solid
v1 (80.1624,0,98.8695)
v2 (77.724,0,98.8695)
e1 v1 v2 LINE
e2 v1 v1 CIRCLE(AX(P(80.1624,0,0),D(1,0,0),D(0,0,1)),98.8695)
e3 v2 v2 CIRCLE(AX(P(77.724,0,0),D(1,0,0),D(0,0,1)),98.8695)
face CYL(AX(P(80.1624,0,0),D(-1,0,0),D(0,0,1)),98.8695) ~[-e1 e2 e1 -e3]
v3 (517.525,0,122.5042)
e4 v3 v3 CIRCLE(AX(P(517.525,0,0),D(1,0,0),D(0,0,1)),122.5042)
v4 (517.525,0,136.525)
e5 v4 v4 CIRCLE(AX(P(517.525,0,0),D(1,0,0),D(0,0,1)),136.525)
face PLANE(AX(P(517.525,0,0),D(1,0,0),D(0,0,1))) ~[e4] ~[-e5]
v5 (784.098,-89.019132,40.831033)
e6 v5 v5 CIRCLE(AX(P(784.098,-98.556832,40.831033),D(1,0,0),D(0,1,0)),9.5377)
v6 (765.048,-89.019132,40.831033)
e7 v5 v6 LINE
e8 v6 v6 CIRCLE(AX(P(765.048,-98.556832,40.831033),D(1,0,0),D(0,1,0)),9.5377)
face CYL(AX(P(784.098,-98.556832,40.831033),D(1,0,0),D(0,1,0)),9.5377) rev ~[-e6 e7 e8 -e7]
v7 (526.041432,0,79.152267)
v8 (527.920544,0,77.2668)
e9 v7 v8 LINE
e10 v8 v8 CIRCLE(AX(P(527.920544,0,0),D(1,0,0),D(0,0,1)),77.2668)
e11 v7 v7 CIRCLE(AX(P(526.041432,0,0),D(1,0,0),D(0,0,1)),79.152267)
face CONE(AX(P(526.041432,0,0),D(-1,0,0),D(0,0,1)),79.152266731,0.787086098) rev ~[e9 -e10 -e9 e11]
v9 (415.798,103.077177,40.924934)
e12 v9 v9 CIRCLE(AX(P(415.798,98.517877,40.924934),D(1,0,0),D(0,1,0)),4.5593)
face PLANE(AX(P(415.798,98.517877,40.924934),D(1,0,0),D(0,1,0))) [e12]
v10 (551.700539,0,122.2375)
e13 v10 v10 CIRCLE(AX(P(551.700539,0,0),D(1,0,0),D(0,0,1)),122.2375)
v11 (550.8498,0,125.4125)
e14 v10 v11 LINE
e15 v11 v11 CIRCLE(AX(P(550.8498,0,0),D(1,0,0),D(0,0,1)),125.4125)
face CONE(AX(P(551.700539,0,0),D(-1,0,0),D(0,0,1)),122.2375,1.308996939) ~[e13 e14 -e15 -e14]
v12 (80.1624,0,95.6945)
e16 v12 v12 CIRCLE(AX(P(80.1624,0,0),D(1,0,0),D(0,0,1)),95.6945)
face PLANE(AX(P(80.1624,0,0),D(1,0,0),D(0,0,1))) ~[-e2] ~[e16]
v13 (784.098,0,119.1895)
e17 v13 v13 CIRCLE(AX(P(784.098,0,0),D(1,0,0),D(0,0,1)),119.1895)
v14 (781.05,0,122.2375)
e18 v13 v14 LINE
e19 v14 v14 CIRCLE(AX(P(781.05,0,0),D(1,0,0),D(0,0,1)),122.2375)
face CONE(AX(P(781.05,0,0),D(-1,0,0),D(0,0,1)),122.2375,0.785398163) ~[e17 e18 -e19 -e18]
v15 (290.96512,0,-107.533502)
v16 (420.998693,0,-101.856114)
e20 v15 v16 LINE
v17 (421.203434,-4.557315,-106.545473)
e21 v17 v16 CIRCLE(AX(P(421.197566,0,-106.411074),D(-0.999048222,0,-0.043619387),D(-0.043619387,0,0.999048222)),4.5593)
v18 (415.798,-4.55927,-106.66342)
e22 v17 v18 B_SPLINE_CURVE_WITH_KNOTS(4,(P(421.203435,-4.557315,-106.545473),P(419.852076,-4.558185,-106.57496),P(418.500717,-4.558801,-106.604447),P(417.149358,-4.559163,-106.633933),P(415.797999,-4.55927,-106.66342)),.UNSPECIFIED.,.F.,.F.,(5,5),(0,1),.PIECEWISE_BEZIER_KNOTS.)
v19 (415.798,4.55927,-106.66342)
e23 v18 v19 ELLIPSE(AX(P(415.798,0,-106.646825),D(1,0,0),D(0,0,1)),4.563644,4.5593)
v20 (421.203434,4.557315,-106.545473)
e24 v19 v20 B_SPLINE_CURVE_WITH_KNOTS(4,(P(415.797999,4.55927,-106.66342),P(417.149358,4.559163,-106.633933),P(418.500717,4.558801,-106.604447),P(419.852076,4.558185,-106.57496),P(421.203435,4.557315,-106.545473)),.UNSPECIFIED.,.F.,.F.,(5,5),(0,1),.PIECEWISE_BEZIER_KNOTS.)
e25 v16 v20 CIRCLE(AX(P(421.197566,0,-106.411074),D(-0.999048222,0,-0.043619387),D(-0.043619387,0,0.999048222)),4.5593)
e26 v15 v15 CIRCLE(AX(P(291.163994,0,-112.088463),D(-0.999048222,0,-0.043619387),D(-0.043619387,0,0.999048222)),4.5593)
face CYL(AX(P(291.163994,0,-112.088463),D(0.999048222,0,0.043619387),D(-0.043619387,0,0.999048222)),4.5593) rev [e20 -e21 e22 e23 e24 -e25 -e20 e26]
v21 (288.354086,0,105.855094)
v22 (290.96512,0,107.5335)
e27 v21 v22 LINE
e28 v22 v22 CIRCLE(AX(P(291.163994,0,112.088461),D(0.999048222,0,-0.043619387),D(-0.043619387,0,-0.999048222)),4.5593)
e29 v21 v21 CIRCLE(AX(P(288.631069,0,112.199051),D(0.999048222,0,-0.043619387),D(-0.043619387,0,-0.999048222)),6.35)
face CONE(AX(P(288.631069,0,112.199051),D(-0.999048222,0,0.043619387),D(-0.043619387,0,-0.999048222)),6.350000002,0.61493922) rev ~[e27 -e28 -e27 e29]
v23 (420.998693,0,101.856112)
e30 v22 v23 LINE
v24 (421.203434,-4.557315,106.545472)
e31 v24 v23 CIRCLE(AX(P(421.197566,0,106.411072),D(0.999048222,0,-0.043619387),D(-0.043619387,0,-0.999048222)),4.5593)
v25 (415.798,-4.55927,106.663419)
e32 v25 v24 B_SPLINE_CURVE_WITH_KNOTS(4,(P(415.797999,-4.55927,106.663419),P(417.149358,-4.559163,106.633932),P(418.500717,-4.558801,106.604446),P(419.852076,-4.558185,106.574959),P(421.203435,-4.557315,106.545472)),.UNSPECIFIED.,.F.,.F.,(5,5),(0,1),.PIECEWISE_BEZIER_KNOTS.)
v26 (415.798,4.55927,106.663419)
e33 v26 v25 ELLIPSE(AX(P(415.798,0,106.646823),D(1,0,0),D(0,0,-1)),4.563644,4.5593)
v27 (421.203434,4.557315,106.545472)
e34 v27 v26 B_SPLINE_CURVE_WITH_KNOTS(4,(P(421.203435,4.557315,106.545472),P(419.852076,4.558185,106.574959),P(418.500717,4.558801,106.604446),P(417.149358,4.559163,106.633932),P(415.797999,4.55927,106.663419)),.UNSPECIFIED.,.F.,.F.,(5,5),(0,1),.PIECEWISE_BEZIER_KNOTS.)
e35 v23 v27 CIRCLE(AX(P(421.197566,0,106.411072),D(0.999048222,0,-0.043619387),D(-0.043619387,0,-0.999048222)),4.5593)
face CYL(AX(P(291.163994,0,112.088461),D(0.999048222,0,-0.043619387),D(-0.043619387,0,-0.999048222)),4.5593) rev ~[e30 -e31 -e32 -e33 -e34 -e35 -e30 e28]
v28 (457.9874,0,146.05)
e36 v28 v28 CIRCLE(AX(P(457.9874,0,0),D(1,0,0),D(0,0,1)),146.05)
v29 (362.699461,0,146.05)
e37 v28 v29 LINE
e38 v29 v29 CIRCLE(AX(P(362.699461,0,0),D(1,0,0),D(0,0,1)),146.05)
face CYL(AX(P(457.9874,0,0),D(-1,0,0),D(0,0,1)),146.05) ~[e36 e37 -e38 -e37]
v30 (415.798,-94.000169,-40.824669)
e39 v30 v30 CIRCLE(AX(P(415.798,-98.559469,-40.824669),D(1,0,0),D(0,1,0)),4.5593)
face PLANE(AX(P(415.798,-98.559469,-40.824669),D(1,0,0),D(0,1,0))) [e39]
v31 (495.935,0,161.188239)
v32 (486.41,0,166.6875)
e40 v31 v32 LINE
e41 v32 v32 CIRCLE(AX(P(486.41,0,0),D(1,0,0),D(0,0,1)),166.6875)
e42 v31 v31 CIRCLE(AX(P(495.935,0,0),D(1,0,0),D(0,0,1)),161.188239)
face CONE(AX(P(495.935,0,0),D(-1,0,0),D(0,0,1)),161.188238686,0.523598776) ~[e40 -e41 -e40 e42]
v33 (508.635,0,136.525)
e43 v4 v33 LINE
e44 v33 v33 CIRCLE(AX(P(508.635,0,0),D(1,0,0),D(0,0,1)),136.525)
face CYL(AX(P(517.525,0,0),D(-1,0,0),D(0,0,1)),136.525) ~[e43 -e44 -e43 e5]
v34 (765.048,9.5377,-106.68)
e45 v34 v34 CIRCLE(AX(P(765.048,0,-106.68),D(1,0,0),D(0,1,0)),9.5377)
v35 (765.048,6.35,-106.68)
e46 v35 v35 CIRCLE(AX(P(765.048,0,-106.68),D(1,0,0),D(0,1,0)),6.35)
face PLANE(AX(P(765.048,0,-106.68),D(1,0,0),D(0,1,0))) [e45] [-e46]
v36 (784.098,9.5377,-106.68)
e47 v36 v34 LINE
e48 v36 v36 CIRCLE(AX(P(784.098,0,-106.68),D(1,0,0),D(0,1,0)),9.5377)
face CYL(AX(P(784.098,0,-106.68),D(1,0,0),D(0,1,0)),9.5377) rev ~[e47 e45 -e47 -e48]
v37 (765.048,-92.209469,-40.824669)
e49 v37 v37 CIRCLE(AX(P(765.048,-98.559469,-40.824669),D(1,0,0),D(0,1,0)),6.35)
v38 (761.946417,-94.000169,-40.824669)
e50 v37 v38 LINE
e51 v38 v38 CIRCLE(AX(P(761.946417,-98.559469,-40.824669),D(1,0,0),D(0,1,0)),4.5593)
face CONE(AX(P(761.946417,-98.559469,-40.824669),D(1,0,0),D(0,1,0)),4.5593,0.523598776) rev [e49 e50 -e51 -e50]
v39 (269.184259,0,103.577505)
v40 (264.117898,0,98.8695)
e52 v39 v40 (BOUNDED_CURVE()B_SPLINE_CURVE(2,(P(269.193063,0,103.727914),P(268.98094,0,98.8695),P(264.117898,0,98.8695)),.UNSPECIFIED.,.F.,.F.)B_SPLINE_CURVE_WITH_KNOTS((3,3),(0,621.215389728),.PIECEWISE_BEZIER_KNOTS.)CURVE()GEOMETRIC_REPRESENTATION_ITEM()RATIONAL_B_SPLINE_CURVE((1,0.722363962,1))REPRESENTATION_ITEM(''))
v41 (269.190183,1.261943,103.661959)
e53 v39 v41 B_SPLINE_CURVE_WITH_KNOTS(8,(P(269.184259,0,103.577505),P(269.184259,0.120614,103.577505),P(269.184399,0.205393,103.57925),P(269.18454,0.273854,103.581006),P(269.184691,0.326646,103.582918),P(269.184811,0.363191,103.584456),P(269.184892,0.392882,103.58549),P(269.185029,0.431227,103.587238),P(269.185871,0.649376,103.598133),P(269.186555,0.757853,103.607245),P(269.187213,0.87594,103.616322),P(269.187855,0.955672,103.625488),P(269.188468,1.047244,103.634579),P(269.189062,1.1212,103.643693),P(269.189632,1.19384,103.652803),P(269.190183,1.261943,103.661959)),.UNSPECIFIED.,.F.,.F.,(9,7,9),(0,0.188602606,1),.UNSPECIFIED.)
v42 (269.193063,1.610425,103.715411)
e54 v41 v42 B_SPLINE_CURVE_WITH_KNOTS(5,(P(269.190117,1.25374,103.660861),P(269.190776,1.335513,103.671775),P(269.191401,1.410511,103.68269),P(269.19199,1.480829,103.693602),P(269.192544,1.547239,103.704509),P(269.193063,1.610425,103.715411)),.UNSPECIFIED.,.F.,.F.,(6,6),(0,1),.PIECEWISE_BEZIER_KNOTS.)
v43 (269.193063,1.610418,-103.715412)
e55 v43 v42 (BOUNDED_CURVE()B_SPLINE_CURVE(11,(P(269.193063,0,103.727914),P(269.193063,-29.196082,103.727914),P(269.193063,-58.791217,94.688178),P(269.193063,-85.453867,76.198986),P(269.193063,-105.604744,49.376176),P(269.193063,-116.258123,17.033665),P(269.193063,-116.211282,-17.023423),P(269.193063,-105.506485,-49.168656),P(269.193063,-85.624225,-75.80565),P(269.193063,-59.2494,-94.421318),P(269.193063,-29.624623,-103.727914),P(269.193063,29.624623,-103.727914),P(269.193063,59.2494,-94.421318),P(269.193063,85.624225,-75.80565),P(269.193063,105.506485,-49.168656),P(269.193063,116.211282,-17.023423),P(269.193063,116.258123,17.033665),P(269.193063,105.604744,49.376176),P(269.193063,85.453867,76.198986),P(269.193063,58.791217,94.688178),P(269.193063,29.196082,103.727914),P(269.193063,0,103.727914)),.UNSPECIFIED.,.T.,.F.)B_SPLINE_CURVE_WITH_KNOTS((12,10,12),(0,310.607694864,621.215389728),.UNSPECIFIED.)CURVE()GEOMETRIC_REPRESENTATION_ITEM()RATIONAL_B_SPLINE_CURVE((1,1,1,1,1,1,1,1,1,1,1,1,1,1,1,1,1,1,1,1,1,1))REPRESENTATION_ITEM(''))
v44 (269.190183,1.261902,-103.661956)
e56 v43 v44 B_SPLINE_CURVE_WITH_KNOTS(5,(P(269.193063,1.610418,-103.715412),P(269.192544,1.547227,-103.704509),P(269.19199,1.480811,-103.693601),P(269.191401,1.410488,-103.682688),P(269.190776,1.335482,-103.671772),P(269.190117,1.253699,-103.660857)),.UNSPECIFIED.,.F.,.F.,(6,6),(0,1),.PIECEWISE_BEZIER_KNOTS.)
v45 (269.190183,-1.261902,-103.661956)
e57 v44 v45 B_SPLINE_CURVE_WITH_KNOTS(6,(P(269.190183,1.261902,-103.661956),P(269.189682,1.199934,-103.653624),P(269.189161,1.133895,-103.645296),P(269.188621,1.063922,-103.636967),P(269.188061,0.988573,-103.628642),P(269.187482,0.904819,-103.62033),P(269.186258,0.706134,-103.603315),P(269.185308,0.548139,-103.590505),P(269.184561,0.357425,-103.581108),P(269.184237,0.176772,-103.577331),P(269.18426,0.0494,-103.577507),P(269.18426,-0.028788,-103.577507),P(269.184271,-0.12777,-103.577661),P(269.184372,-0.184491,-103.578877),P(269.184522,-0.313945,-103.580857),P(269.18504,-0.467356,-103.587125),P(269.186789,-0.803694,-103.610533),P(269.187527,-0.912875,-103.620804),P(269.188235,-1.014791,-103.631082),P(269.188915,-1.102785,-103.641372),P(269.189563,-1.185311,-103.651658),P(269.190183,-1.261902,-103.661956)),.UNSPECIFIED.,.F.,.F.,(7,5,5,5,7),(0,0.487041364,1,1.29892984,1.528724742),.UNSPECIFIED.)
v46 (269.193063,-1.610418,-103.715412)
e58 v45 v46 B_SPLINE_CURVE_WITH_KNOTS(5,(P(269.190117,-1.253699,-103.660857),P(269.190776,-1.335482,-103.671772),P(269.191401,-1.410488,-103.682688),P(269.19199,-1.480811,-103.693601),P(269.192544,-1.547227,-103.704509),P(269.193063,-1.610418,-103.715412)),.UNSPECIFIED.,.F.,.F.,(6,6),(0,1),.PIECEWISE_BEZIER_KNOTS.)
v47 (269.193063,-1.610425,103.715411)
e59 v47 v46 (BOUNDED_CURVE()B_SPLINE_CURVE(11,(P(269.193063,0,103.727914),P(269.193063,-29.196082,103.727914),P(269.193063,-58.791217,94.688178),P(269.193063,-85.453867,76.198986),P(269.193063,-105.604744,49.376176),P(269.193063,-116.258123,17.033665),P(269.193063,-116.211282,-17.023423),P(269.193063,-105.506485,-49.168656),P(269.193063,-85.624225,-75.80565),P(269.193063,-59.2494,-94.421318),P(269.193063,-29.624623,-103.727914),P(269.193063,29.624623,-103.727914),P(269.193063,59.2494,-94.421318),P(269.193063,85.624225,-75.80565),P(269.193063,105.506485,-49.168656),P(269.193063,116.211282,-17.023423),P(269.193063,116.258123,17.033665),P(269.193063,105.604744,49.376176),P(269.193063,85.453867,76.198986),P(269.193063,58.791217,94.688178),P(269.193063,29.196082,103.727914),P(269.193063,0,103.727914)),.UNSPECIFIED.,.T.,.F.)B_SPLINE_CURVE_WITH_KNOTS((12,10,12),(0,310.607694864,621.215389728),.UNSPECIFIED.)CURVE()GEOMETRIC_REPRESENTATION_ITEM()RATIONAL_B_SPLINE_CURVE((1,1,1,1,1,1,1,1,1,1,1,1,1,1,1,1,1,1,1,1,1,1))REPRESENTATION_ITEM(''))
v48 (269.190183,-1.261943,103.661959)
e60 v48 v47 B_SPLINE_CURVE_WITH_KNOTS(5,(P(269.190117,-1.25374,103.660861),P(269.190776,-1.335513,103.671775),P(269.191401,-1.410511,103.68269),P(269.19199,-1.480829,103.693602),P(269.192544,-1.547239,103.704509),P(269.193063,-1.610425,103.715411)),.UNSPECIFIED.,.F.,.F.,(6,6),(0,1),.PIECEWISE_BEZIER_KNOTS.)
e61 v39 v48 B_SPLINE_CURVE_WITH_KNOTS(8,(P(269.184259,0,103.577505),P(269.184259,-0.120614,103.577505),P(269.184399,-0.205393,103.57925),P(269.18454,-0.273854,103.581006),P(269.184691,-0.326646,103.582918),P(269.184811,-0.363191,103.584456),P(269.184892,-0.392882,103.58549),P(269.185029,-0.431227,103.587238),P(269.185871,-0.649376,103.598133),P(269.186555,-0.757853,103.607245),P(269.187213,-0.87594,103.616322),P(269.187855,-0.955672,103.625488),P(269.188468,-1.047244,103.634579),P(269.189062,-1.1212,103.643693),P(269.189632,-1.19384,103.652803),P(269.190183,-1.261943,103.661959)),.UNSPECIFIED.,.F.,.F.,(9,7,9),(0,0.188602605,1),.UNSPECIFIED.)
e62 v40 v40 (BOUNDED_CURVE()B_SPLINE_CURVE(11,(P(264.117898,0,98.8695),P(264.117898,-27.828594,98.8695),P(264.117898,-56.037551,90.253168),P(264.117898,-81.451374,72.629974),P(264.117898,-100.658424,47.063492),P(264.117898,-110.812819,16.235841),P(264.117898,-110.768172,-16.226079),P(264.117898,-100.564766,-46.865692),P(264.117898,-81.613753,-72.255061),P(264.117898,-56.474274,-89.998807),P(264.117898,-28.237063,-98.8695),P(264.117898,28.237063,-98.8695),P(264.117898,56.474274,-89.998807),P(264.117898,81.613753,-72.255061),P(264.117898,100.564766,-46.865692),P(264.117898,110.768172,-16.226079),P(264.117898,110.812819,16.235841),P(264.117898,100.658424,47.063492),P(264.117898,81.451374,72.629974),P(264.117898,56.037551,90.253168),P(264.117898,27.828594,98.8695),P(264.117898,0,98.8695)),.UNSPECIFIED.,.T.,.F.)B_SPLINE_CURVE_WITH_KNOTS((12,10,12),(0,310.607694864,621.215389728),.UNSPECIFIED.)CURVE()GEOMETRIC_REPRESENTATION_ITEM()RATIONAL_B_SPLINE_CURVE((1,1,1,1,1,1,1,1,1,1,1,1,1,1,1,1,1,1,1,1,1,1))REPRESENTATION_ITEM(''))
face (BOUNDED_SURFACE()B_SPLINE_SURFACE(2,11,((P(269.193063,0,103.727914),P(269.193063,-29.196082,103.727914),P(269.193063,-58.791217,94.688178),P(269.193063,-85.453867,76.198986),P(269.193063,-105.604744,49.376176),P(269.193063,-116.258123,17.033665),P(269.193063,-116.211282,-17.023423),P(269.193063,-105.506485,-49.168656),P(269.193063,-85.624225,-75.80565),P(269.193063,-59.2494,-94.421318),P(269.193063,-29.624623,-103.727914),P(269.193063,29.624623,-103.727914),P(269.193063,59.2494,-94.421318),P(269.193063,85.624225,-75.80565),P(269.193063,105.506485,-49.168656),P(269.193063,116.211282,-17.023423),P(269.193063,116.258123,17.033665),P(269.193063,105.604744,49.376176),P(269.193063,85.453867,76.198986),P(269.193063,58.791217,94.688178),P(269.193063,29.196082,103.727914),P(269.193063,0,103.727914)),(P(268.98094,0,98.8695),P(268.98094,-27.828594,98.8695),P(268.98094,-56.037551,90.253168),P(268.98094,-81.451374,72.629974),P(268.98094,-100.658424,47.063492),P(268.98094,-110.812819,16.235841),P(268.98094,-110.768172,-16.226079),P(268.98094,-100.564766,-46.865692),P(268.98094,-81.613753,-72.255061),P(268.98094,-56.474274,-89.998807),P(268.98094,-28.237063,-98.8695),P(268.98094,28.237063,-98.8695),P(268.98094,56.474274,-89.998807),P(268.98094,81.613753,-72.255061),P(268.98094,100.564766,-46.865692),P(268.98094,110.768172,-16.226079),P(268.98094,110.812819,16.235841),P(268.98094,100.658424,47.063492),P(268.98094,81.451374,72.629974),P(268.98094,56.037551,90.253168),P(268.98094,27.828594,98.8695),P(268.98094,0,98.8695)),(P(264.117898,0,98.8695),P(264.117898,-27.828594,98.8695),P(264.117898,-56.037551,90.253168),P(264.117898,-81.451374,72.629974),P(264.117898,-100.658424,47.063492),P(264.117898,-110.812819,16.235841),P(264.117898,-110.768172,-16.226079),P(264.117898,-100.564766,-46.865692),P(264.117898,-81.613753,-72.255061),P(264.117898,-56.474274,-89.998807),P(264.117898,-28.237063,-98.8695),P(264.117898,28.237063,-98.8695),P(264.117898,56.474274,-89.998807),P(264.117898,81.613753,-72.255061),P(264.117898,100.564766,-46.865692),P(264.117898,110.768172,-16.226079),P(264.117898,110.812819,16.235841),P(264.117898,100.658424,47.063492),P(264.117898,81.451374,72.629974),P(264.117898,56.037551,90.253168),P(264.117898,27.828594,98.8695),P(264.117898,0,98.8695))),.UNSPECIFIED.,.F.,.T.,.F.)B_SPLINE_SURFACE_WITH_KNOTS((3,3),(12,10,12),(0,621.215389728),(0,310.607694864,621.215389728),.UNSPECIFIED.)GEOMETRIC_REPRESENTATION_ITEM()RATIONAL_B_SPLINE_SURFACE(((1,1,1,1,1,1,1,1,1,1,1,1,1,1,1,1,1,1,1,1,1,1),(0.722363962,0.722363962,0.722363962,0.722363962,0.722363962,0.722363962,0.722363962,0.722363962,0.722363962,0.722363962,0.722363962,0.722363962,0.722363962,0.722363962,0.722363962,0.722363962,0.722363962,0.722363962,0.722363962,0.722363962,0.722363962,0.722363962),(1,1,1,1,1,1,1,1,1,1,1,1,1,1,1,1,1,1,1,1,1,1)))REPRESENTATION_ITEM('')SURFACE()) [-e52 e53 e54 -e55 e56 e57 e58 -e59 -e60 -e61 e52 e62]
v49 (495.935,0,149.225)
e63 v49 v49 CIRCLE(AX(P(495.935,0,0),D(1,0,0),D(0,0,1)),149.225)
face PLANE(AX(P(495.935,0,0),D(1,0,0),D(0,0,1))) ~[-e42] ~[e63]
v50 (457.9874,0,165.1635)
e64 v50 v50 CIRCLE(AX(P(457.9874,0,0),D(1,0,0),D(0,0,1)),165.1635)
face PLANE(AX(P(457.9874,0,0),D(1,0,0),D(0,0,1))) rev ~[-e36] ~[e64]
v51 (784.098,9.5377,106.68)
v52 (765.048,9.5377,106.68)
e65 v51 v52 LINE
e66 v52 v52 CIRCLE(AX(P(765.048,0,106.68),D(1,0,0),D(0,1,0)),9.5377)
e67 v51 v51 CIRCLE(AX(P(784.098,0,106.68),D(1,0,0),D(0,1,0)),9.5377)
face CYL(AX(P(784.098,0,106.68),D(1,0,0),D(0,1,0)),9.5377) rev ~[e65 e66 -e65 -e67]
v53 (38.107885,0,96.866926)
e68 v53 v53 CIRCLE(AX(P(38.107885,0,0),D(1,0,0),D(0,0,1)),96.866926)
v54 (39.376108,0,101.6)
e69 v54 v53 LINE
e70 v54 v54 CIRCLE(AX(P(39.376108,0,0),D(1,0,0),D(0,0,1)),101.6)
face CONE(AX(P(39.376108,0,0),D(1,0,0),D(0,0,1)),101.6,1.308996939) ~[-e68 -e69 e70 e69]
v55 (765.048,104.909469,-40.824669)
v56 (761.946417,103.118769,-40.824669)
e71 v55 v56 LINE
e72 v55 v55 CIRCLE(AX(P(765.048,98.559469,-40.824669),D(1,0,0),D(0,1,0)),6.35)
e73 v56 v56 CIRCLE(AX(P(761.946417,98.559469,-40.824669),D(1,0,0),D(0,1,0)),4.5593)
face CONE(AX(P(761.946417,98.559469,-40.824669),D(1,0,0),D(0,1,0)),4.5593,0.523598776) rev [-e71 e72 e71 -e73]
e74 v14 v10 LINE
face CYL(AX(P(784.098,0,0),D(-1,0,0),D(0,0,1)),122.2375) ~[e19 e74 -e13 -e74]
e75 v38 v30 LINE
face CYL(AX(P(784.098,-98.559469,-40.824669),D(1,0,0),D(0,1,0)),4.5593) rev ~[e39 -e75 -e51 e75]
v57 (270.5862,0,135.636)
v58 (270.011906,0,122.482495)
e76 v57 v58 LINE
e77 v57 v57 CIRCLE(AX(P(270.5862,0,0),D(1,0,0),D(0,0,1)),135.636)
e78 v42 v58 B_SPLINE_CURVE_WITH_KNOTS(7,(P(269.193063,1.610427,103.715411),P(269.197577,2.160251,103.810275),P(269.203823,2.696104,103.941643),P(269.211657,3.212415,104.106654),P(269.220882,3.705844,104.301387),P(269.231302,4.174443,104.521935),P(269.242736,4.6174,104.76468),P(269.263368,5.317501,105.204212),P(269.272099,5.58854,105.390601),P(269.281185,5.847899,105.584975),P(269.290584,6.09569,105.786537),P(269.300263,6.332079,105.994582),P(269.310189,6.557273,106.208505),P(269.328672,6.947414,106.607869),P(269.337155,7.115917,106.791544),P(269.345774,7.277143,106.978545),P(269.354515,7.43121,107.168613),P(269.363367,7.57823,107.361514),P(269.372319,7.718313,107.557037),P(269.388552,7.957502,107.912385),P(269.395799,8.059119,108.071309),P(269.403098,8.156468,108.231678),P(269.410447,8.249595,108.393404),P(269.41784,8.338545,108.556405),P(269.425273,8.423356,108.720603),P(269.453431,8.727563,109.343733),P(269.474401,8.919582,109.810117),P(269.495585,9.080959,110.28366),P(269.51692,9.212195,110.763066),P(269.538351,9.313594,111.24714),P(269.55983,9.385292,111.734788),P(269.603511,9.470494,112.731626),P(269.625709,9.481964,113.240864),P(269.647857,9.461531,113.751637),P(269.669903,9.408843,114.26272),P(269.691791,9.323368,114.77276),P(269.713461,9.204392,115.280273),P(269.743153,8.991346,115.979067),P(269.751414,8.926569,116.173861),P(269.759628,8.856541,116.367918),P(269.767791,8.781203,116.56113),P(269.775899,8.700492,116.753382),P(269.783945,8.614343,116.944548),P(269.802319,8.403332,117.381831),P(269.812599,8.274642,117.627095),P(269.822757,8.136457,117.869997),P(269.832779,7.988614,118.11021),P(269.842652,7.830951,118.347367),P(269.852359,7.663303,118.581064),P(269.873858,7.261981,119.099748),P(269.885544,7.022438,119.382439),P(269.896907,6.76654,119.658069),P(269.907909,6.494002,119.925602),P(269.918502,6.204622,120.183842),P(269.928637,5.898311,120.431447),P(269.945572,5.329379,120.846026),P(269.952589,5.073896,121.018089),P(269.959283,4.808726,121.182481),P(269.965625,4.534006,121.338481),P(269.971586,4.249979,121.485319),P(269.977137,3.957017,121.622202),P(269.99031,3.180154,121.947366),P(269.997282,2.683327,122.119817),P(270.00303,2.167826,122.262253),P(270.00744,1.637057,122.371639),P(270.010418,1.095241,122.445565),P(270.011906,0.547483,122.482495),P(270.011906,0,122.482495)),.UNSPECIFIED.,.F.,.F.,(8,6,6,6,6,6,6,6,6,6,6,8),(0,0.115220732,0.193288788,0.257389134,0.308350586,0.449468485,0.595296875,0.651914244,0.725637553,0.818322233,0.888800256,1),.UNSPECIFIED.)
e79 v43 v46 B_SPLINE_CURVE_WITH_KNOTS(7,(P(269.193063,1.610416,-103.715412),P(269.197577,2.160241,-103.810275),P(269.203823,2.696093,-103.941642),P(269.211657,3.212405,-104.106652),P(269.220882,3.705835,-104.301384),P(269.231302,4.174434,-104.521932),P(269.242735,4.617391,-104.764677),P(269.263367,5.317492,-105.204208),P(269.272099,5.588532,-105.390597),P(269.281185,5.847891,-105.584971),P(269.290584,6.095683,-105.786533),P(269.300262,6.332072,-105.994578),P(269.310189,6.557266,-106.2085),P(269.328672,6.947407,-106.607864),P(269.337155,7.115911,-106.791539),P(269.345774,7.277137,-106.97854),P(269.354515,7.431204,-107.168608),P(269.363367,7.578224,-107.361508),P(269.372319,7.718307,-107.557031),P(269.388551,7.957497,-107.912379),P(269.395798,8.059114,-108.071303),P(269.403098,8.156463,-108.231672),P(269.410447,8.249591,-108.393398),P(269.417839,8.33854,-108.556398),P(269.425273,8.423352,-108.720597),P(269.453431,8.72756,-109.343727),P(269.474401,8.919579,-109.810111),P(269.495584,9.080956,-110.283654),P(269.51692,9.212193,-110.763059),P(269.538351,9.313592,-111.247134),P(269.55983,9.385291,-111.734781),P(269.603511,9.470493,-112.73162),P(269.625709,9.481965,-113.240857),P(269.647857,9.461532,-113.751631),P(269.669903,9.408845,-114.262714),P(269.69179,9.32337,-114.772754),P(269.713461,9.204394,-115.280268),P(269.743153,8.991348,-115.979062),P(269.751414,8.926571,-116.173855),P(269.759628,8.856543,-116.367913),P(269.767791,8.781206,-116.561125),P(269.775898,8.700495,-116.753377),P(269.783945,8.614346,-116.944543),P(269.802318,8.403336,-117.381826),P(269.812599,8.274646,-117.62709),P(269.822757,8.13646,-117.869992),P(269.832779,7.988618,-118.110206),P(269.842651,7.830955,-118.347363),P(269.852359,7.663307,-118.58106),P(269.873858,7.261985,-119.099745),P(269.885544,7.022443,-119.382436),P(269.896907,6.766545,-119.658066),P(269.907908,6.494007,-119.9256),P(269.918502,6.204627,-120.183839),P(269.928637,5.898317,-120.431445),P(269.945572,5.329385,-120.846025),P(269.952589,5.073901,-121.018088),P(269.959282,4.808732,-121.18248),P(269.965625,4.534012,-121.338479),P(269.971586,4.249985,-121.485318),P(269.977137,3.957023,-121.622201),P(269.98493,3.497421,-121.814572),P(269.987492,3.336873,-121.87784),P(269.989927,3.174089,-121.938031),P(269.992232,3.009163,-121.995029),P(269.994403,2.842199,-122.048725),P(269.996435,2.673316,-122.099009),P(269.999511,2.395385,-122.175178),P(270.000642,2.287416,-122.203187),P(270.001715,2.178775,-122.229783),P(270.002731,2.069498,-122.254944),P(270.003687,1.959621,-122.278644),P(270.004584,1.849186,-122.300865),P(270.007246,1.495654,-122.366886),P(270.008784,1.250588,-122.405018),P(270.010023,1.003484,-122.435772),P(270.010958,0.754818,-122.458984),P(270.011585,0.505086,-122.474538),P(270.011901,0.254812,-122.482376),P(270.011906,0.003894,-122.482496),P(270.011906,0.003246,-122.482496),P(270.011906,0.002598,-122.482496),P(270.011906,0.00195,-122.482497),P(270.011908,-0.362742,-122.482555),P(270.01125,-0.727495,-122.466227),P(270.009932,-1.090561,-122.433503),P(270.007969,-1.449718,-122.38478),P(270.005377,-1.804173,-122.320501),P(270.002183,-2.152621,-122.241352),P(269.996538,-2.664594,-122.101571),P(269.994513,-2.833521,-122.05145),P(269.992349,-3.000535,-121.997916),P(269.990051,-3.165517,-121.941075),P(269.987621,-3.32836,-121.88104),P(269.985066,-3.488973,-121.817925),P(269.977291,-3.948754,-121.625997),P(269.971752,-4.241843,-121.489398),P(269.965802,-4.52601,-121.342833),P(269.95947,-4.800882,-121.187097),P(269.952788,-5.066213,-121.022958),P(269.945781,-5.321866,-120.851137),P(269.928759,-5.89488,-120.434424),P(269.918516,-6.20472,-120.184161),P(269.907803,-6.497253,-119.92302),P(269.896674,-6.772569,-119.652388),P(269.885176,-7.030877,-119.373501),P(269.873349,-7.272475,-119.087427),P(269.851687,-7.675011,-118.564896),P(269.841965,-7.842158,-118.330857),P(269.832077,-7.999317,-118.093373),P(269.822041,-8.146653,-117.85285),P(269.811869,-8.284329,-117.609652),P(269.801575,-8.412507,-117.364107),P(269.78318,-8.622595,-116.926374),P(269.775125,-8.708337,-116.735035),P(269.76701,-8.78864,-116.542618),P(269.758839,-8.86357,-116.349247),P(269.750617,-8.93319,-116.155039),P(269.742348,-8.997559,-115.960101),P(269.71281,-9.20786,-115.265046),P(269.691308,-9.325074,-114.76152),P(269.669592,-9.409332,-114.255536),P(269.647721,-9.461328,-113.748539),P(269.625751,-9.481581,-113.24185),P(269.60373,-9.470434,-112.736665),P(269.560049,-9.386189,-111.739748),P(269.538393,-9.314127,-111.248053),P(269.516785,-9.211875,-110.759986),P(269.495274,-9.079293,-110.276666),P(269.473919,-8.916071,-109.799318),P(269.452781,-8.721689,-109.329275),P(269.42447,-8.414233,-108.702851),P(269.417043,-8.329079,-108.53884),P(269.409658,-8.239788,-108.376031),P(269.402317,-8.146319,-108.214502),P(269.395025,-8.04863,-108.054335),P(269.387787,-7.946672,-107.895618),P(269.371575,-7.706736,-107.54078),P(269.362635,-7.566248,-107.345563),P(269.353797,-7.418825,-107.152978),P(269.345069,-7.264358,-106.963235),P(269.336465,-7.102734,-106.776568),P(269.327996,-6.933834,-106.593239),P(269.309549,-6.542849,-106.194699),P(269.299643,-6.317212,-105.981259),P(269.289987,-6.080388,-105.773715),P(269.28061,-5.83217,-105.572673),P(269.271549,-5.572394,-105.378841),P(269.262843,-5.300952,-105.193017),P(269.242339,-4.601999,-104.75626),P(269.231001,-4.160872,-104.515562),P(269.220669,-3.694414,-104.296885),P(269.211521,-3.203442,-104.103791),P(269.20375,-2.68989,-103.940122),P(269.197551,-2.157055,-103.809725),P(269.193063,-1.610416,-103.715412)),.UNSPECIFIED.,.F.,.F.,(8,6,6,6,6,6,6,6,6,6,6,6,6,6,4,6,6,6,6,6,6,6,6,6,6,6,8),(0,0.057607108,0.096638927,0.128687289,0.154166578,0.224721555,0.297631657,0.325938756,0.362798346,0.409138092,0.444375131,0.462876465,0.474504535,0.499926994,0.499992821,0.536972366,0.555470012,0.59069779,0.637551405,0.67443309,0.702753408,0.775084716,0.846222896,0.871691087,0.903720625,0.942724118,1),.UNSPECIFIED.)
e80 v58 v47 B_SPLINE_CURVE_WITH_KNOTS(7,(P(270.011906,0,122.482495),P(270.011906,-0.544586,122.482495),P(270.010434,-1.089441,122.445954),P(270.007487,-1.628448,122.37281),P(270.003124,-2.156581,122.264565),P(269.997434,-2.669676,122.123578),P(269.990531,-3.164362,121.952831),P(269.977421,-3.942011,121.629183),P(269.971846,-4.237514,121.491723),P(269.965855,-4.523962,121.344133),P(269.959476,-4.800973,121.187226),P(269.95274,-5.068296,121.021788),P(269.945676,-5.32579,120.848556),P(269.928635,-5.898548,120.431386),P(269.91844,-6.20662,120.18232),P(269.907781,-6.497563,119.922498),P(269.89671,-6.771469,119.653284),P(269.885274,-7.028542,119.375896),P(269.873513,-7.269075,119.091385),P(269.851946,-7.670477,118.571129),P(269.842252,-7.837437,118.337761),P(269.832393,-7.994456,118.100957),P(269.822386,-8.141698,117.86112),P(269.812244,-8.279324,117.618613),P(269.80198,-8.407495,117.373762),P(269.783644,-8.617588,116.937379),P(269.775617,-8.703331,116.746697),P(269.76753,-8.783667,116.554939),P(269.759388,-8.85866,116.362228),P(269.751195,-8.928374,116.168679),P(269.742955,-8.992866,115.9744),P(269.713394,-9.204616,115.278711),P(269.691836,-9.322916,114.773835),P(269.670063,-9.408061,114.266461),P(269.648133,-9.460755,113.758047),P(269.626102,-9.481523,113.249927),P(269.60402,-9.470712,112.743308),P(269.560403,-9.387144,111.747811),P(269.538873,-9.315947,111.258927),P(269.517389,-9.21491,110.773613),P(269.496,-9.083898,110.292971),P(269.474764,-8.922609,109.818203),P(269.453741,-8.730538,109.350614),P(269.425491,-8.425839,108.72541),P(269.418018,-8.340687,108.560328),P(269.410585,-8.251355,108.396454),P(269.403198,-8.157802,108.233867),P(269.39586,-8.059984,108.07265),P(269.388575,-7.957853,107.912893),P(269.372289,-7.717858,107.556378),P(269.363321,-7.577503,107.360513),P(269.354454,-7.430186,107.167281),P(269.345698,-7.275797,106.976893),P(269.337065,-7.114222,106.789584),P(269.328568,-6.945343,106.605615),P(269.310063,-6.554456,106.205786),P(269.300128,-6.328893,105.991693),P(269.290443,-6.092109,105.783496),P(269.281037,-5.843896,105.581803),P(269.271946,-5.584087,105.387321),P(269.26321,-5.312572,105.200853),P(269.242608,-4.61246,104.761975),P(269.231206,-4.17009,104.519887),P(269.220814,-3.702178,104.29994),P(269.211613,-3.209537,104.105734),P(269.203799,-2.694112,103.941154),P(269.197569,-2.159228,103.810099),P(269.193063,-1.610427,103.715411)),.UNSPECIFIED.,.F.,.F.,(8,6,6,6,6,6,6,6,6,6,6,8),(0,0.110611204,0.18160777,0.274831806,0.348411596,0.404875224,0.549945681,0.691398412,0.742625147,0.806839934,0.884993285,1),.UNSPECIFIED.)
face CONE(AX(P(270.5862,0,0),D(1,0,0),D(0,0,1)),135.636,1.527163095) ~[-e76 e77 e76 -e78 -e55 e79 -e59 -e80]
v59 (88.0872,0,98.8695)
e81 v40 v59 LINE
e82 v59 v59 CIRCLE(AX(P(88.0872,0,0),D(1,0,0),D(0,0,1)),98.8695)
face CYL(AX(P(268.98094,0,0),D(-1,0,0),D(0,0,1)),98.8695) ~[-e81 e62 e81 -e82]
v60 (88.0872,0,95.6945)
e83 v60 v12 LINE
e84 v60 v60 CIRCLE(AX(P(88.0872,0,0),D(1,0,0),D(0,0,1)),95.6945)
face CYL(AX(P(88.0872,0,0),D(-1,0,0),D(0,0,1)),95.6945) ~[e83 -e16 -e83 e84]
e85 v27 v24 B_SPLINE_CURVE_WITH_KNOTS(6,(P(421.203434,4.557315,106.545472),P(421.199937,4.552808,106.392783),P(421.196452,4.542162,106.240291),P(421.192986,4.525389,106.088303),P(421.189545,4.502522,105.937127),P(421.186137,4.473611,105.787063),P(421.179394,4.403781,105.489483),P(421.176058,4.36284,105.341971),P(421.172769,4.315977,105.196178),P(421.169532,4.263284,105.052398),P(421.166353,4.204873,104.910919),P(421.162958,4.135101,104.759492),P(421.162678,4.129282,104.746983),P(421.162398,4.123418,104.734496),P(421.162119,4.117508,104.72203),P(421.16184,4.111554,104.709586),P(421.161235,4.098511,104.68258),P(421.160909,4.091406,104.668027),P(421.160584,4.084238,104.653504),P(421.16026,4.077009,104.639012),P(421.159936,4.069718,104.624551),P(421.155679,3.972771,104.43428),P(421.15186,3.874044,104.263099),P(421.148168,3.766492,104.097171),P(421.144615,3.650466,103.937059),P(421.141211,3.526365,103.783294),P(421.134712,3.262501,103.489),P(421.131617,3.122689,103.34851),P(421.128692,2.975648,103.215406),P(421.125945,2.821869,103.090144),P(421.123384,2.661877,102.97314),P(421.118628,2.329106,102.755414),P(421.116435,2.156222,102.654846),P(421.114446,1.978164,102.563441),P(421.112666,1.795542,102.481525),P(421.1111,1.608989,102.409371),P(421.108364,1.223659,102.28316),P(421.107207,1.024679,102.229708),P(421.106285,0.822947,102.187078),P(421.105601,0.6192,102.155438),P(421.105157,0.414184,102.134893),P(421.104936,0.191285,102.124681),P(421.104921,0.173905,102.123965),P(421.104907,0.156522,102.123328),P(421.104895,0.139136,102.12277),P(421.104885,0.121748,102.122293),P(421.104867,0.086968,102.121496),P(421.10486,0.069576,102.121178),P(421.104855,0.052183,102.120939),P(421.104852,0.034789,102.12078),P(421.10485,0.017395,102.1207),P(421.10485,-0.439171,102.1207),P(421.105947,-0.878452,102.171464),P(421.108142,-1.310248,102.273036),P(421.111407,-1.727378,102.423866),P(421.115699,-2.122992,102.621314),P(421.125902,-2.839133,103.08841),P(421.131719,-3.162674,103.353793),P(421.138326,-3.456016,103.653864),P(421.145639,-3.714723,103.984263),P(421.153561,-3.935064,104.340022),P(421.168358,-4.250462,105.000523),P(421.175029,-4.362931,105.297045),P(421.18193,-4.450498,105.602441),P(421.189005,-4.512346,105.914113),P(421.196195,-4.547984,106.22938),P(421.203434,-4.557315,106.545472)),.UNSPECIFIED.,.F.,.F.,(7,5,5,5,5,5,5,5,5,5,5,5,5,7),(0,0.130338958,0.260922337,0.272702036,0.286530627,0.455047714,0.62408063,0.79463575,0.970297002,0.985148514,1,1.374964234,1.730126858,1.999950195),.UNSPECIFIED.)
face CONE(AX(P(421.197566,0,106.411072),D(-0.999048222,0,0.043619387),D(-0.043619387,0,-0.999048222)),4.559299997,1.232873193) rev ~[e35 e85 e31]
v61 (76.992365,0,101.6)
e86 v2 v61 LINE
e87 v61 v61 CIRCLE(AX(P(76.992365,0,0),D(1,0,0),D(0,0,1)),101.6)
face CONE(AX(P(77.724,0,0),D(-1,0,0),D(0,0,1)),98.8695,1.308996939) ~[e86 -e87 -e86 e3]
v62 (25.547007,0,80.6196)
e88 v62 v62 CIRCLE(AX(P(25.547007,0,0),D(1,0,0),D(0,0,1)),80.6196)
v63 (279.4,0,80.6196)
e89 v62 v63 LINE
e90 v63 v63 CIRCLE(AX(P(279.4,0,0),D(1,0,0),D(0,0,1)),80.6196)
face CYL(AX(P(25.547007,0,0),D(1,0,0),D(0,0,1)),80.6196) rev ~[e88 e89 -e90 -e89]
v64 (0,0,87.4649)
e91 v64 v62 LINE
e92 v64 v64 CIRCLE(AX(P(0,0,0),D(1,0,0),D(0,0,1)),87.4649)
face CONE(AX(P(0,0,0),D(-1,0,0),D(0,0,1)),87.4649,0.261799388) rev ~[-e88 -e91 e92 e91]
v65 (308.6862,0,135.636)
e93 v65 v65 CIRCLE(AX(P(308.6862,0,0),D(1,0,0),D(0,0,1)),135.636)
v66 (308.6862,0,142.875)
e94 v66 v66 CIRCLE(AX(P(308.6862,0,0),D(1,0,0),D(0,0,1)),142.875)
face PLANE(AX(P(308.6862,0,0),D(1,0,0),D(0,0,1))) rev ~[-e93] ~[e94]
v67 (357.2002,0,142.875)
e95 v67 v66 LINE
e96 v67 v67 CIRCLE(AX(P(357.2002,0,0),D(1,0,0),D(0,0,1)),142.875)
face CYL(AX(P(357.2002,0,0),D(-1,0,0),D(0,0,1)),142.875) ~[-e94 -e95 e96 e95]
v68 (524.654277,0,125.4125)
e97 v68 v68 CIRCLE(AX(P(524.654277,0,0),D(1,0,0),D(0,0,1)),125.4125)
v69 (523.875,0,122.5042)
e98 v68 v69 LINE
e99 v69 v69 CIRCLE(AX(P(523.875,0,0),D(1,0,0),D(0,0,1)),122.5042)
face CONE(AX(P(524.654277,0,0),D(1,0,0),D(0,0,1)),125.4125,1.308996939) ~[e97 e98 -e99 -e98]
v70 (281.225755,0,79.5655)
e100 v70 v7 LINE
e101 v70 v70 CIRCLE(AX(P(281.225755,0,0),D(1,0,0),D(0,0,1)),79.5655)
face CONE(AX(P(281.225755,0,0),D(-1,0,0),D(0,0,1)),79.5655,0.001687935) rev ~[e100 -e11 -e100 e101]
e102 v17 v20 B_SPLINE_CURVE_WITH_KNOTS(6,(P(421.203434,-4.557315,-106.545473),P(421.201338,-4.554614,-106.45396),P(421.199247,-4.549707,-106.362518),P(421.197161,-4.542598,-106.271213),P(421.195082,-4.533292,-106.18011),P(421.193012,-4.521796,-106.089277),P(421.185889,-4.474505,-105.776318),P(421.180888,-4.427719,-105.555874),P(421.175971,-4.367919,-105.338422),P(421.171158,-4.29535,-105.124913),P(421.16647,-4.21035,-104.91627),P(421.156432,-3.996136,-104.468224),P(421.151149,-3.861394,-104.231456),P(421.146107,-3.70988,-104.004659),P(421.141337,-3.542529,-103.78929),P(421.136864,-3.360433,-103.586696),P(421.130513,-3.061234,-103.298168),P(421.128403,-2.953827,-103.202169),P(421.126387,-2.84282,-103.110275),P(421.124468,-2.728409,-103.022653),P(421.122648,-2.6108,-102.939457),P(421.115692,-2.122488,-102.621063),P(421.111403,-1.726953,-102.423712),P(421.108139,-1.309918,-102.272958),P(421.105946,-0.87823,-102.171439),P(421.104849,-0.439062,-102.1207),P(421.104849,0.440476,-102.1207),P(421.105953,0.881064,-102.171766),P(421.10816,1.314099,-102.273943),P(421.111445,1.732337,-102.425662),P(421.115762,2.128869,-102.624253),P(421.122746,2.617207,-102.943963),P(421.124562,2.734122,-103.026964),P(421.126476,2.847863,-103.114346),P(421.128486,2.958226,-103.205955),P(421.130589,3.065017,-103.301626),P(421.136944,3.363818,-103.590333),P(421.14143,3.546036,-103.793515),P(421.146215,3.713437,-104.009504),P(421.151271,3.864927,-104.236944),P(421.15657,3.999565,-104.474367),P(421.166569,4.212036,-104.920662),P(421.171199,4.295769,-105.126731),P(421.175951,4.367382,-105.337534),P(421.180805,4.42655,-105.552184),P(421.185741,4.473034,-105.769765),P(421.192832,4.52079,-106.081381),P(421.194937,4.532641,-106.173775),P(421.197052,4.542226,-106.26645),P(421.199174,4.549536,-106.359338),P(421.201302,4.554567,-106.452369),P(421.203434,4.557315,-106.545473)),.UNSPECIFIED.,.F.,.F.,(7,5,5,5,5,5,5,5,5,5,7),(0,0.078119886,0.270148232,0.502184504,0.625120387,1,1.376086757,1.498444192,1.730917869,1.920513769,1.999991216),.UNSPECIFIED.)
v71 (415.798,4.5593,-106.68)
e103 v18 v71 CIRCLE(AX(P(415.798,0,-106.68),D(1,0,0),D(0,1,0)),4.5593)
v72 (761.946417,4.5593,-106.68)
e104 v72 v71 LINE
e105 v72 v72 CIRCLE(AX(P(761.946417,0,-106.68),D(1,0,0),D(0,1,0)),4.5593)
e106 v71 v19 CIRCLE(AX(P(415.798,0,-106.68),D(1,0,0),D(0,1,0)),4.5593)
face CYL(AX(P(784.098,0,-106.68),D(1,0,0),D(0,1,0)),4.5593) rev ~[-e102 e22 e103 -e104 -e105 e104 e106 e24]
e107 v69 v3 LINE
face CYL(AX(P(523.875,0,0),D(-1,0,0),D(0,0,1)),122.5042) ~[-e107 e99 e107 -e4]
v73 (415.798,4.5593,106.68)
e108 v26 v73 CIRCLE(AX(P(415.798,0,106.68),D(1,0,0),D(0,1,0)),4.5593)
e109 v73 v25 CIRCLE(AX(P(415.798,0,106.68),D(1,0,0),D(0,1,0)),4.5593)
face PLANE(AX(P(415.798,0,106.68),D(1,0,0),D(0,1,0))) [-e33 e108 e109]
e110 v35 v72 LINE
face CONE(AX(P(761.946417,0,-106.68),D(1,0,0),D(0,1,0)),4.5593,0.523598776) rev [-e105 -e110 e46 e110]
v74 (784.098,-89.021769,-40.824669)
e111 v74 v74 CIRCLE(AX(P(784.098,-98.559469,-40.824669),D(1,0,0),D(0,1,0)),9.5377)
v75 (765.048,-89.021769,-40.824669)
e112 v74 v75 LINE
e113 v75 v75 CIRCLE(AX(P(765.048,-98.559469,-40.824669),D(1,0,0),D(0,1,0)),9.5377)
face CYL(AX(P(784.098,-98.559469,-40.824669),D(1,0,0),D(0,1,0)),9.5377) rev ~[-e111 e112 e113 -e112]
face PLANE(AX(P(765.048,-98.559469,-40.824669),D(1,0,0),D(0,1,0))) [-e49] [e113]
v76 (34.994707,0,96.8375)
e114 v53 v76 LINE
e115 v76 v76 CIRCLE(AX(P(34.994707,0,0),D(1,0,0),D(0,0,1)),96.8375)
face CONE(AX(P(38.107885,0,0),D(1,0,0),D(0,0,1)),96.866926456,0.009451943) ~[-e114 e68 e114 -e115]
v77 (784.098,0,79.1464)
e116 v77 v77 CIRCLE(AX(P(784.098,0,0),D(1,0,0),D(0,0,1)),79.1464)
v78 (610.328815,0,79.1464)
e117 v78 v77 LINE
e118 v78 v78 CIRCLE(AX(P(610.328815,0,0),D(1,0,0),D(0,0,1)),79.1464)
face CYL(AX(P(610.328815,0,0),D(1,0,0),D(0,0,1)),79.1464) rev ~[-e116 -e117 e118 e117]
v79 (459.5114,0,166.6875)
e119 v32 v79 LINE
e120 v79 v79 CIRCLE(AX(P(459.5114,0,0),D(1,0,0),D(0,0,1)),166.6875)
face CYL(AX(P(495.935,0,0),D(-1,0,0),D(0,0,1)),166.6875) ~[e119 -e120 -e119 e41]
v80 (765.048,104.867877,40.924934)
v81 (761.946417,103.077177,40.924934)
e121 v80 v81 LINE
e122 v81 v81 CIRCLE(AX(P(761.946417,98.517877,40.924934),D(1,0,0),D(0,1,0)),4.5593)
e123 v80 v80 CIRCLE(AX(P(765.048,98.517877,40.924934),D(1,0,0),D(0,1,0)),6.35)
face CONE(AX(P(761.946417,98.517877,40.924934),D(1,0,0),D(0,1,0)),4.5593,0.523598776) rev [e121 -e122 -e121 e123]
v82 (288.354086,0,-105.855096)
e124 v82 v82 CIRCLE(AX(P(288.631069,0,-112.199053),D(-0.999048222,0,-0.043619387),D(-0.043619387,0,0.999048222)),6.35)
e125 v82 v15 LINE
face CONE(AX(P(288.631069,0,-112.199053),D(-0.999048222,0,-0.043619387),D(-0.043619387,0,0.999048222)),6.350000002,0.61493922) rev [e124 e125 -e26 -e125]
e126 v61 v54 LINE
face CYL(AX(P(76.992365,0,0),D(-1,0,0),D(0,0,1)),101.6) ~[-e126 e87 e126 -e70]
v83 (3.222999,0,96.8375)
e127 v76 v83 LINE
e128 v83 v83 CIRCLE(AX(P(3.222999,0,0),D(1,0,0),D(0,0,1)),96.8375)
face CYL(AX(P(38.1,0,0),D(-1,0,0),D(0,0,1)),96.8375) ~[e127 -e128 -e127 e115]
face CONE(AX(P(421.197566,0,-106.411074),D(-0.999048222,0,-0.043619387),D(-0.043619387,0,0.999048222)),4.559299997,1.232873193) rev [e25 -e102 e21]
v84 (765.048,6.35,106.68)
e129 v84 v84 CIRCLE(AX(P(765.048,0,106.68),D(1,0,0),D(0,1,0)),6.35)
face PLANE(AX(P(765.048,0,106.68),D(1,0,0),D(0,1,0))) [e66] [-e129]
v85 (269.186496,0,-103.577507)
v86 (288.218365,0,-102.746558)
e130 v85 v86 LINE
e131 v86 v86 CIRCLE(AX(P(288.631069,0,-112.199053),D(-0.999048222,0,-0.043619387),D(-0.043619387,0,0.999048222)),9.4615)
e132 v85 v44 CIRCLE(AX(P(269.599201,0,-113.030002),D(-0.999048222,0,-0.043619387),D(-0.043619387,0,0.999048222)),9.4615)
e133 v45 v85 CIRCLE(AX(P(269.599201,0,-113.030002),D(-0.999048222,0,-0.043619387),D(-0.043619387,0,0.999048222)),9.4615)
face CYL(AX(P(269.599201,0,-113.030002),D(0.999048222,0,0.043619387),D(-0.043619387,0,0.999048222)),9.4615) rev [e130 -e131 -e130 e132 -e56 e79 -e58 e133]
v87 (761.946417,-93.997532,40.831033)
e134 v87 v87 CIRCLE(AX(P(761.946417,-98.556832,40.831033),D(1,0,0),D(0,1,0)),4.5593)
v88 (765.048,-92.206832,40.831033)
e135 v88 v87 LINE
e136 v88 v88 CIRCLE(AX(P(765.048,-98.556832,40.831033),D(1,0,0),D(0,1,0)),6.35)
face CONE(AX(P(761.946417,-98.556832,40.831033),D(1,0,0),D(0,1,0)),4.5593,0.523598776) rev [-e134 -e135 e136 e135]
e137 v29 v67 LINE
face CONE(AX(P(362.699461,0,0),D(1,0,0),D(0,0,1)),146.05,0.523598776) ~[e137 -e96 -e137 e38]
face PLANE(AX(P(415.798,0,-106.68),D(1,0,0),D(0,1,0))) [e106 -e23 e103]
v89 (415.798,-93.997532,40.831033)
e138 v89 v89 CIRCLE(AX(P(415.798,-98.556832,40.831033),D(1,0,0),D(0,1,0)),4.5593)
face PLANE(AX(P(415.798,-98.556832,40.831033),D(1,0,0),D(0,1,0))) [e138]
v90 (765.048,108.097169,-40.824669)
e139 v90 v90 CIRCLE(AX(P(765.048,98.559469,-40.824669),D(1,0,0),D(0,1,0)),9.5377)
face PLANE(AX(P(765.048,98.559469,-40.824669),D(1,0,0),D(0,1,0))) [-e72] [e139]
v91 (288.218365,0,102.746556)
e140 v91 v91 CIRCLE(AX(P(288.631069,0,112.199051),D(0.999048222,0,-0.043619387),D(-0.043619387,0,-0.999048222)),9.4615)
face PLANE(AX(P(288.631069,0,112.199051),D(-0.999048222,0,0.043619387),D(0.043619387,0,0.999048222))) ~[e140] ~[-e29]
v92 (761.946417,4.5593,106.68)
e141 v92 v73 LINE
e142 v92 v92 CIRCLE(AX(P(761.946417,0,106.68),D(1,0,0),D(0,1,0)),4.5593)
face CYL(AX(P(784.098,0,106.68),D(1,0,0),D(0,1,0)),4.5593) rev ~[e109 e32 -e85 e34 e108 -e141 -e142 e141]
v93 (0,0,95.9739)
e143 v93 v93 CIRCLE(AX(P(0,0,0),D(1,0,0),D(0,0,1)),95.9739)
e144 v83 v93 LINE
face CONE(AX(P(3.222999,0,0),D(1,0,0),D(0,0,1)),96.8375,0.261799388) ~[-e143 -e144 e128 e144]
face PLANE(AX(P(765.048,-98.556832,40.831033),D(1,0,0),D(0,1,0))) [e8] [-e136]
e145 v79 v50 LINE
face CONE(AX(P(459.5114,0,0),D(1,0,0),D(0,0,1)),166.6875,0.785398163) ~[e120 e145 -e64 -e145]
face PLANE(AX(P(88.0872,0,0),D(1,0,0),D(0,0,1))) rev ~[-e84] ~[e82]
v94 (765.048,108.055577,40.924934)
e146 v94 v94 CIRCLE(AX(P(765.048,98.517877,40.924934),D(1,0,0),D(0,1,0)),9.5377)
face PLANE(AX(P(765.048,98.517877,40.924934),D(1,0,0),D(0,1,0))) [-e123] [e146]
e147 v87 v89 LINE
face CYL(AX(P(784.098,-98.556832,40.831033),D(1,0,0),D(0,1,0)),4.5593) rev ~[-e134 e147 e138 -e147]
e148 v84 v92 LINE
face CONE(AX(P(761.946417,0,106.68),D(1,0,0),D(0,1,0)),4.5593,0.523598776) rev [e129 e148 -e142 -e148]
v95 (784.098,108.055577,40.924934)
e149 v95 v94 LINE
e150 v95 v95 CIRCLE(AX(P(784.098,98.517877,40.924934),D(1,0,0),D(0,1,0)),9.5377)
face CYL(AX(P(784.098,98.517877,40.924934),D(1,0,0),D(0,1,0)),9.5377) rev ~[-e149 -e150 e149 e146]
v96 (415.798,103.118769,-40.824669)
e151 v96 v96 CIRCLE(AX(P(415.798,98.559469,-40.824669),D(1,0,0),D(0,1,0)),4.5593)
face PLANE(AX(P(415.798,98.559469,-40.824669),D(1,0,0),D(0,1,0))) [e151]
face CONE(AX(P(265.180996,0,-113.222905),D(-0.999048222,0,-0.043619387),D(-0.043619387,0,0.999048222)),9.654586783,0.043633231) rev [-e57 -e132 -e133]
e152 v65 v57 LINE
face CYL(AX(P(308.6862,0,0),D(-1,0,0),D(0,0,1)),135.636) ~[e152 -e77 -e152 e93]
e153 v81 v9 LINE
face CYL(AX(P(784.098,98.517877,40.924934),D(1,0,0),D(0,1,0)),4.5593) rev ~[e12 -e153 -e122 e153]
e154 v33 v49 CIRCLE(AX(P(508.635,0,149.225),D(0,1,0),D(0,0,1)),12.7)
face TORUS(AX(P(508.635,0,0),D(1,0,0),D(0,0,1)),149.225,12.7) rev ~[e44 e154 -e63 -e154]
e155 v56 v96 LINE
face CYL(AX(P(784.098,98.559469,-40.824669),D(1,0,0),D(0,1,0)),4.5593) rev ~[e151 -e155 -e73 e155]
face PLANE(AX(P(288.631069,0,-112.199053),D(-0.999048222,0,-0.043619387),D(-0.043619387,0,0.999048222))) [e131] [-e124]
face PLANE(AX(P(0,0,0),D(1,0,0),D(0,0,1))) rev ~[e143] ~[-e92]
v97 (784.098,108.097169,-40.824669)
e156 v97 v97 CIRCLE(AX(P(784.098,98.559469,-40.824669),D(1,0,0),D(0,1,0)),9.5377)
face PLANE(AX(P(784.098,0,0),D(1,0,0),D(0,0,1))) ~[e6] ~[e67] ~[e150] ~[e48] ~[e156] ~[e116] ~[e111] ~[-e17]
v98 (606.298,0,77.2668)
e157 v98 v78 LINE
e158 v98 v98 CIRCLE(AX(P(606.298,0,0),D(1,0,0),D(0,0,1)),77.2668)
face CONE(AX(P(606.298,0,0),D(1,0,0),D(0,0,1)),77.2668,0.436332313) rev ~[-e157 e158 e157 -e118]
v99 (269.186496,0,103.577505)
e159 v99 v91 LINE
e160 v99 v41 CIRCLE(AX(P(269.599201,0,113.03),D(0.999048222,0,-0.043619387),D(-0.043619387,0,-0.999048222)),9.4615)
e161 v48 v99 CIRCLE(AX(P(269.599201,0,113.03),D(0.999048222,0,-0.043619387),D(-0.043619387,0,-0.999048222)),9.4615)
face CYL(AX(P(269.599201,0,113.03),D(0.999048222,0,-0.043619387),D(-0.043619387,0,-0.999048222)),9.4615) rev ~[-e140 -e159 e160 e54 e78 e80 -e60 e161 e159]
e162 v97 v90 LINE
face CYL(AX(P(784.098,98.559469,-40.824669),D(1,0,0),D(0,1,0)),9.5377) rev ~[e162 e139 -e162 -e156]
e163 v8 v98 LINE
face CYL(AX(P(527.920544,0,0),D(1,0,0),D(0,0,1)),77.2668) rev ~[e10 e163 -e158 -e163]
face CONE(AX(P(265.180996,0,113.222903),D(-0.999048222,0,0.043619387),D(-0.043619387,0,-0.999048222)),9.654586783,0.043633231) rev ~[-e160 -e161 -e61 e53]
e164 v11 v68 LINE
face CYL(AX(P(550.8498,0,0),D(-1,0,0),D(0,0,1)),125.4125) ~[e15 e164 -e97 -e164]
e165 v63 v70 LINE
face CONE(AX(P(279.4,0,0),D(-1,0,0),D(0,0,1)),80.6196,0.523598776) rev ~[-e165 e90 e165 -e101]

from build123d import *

# Parameters (mm, degrees)
F3_R      = 12.7
F4_R      = 5.08
F6_SIZE   = 3.048
F7_SIZE   = 1.524
F8_R      = 4.5593
F9_DEPTH  = 368.3
F10_R     = 9.5377
F11_DEPTH = 19.05
F12_SIZE2 = 3.1015833811
F12_SIZE  = 1.7907


# Not quite as in the source:
# - a fillet or chamfer that OpenCascade refuses, or shapes differently, is made with other operations: its cross-section is extruded or revolved along the edge and cut away or added
# - a pattern or mirror of a feature is missing from the dataset's text; its kind, count and spacing are read off the source's solid


with BuildPart() as f1:
    # F0 (on Front) → F1 (revolve)
    with BuildSketch(Plane.XZ):
        Polygon((38.1, 96.8375), (0, 96.8375), (0, 87.4649), (25.5470073931, 80.6196), (279.4, 80.6196), (281.2257547563, 79.5655), (526.0414317867, 79.1522667305), (527.9205441475, 77.2668), (606.298, 77.2668), (610.3288152078, 79.1464), (784.098, 79.1464), (784.098, 122.2375), (551.700538686, 122.2375), (550.8498, 125.4125), (524.6542766363, 125.4125), (523.875, 122.5042), (517.525, 122.5042), (517.525, 136.525), (495.935, 136.525), (495.935, 166.6875), (457.9874, 166.6875), (457.9874, 146.05), (362.699461314, 146.05), (357.2002, 142.875), (308.6862, 142.875), (308.6862, 135.636), (270.5862, 135.636), (268.9809399426, 98.8695), (88.0872, 98.8695), (88.0872, 95.6945), (80.1624, 95.6945), (80.1624, 98.8695), (77.724, 98.8695), (76.9923647301, 101.6), (39.376108029, 101.6), align=None)
    revolve(axis=Axis((392.049, 0, 0), (1, 0, 0)))

    # F2: chamfer of 9.525 x 5.499261314 on 1 edges, made by hand

    # F2_s1 → F2_t2 (revolve, cut)
    with BuildSketch(Plane.XZ):
        Polygon((495.935, 161.188238686), (486.41, 166.6875), (495.935, 166.6875), align=None)
    revolve(axis=Axis((495.935, 0, 0), (1, 0, 0)), mode=Mode.SUBTRACT)

    # F3
    f3_edges = [f1.edges().sort_by_distance(p)[0] for p in [
        (495.935, 0, -136.525),
    ]]
    fillet(f3_edges, radius=F3_R)

    # F4
    f4_edges = [f1.edges().sort_by_distance(p)[0] for p in [
        (268.98094, 0, -98.8695),
    ]]
    fillet(f4_edges, radius=F4_R)

    # F5: chamfer of 0.8636 x 3.2229990774 on 2 edges, made by hand

    # F5_s1 → F5_t2 (revolve)
    with BuildSketch(Plane.XZ):
        Polygon((38.1078847952, 96.8669264564), (34.9947067483, 96.8375), (38.1, 96.8375), align=None)
    revolve(axis=Axis((38.1, 0, 0), (1, 0, 0)))

    # F5_s3 → F5_t4 (revolve, cut)
    with BuildSketch(Plane.XZ):
        Polygon((3.2229990774, 96.8375), (0, 95.9739), (0, 96.8375), align=None)
    revolve(axis=Axis((0, 0, 0), (1, 0, 0)), mode=Mode.SUBTRACT)

    # F6
    f6_edges = [f1.edges().sort_by_distance(p)[0] for p in [
        (784.098, 0, -122.2375),
    ]]
    chamfer(f6_edges, length=F6_SIZE)

    # F7
    f7_edges = [f1.edges().sort_by_distance(p)[0] for p in [
        (457.9874, 0, -166.6875),
    ]]
    chamfer(f7_edges, length=F7_SIZE)

    # F8 (on face) → F9 (cut)
    with BuildSketch(Plane.YZ.offset(784.098)):
        with Locations((0, 106.68)):
            Circle(F8_R)
        with Locations((0, -106.68)):
            Circle(F8_R)
        with Locations((98.5178773125, 40.9249343291)):
            Circle(F8_R)
        with Locations((98.5594685283, -40.8246685647)):
            Circle(F8_R)
        with Locations((-98.5594685283, -40.8246685647)):
            Circle(F8_R)
        with Locations((-98.5568319807, 40.8310331723)):
            Circle(F8_R)
    extrude(amount=-F9_DEPTH, mode=Mode.SUBTRACT)

    # F10 (on face) → F11 (cut)
    with BuildSketch(Plane.YZ.offset(784.098)):
        with Locations((98.5178773125, 40.9249343291)):
            Circle(F10_R)
        with Locations((0, 106.68)):
            Circle(F10_R)
        with Locations((-98.5568319807, 40.8310331723)):
            Circle(F10_R)
        with Locations((-98.5594685283, -40.8246685647)):
            Circle(F10_R)
        with Locations((98.5594685283, -40.8246685647)):
            Circle(F10_R)
        with Locations((0, -106.68)):
            Circle(F10_R)
    extrude(amount=-F11_DEPTH, mode=Mode.SUBTRACT)

    # F12
    f12_edges = [f1.edges().sort_by_distance(p)[0] for p in [
        (765.048, -4.5593, 106.68),
        (765.048, -103.116132, 40.831033),
        (765.048, -4.5593, -106.68),
        (765.048, -103.118769, -40.824669),
        (765.048, 94.000169, -40.824669),
        (765.048, 93.958577, 40.924934),
    ]]
    chamfer(f12_edges, length=F12_SIZE, length2=F12_SIZE2)

    # F13 (on Front) → F14 (revolve, cut)
    with BuildSketch(Plane.XZ):
        Polygon((422.798187933, 106.3411877659), (269.5992007246, 113.03), (264.7598683834, 110.7791513205), (264.7598683834, 103.5775052515), (269.1864958911, 103.5775052515), (288.2183645122, 102.7465559222), (288.354086236, 105.8550944636), (290.9651204006, 107.5335002234), (420.9986925125, 101.8561118552), align=None)
    f14 = revolve(axis=Axis((346.1986943288, 0, 109.6855938829), (0.9990482216, 0, -0.0436193874)), mode=Mode.SUBTRACT)

    # F14_copies: F14 across plane
    add(f14.mirror(Plane(origin=(0, 0, -1e-06), x_dir=(-1, 0, 0), z_dir=(0, 0, -1))), mode=Mode.SUBTRACT)


solid = f1.part
